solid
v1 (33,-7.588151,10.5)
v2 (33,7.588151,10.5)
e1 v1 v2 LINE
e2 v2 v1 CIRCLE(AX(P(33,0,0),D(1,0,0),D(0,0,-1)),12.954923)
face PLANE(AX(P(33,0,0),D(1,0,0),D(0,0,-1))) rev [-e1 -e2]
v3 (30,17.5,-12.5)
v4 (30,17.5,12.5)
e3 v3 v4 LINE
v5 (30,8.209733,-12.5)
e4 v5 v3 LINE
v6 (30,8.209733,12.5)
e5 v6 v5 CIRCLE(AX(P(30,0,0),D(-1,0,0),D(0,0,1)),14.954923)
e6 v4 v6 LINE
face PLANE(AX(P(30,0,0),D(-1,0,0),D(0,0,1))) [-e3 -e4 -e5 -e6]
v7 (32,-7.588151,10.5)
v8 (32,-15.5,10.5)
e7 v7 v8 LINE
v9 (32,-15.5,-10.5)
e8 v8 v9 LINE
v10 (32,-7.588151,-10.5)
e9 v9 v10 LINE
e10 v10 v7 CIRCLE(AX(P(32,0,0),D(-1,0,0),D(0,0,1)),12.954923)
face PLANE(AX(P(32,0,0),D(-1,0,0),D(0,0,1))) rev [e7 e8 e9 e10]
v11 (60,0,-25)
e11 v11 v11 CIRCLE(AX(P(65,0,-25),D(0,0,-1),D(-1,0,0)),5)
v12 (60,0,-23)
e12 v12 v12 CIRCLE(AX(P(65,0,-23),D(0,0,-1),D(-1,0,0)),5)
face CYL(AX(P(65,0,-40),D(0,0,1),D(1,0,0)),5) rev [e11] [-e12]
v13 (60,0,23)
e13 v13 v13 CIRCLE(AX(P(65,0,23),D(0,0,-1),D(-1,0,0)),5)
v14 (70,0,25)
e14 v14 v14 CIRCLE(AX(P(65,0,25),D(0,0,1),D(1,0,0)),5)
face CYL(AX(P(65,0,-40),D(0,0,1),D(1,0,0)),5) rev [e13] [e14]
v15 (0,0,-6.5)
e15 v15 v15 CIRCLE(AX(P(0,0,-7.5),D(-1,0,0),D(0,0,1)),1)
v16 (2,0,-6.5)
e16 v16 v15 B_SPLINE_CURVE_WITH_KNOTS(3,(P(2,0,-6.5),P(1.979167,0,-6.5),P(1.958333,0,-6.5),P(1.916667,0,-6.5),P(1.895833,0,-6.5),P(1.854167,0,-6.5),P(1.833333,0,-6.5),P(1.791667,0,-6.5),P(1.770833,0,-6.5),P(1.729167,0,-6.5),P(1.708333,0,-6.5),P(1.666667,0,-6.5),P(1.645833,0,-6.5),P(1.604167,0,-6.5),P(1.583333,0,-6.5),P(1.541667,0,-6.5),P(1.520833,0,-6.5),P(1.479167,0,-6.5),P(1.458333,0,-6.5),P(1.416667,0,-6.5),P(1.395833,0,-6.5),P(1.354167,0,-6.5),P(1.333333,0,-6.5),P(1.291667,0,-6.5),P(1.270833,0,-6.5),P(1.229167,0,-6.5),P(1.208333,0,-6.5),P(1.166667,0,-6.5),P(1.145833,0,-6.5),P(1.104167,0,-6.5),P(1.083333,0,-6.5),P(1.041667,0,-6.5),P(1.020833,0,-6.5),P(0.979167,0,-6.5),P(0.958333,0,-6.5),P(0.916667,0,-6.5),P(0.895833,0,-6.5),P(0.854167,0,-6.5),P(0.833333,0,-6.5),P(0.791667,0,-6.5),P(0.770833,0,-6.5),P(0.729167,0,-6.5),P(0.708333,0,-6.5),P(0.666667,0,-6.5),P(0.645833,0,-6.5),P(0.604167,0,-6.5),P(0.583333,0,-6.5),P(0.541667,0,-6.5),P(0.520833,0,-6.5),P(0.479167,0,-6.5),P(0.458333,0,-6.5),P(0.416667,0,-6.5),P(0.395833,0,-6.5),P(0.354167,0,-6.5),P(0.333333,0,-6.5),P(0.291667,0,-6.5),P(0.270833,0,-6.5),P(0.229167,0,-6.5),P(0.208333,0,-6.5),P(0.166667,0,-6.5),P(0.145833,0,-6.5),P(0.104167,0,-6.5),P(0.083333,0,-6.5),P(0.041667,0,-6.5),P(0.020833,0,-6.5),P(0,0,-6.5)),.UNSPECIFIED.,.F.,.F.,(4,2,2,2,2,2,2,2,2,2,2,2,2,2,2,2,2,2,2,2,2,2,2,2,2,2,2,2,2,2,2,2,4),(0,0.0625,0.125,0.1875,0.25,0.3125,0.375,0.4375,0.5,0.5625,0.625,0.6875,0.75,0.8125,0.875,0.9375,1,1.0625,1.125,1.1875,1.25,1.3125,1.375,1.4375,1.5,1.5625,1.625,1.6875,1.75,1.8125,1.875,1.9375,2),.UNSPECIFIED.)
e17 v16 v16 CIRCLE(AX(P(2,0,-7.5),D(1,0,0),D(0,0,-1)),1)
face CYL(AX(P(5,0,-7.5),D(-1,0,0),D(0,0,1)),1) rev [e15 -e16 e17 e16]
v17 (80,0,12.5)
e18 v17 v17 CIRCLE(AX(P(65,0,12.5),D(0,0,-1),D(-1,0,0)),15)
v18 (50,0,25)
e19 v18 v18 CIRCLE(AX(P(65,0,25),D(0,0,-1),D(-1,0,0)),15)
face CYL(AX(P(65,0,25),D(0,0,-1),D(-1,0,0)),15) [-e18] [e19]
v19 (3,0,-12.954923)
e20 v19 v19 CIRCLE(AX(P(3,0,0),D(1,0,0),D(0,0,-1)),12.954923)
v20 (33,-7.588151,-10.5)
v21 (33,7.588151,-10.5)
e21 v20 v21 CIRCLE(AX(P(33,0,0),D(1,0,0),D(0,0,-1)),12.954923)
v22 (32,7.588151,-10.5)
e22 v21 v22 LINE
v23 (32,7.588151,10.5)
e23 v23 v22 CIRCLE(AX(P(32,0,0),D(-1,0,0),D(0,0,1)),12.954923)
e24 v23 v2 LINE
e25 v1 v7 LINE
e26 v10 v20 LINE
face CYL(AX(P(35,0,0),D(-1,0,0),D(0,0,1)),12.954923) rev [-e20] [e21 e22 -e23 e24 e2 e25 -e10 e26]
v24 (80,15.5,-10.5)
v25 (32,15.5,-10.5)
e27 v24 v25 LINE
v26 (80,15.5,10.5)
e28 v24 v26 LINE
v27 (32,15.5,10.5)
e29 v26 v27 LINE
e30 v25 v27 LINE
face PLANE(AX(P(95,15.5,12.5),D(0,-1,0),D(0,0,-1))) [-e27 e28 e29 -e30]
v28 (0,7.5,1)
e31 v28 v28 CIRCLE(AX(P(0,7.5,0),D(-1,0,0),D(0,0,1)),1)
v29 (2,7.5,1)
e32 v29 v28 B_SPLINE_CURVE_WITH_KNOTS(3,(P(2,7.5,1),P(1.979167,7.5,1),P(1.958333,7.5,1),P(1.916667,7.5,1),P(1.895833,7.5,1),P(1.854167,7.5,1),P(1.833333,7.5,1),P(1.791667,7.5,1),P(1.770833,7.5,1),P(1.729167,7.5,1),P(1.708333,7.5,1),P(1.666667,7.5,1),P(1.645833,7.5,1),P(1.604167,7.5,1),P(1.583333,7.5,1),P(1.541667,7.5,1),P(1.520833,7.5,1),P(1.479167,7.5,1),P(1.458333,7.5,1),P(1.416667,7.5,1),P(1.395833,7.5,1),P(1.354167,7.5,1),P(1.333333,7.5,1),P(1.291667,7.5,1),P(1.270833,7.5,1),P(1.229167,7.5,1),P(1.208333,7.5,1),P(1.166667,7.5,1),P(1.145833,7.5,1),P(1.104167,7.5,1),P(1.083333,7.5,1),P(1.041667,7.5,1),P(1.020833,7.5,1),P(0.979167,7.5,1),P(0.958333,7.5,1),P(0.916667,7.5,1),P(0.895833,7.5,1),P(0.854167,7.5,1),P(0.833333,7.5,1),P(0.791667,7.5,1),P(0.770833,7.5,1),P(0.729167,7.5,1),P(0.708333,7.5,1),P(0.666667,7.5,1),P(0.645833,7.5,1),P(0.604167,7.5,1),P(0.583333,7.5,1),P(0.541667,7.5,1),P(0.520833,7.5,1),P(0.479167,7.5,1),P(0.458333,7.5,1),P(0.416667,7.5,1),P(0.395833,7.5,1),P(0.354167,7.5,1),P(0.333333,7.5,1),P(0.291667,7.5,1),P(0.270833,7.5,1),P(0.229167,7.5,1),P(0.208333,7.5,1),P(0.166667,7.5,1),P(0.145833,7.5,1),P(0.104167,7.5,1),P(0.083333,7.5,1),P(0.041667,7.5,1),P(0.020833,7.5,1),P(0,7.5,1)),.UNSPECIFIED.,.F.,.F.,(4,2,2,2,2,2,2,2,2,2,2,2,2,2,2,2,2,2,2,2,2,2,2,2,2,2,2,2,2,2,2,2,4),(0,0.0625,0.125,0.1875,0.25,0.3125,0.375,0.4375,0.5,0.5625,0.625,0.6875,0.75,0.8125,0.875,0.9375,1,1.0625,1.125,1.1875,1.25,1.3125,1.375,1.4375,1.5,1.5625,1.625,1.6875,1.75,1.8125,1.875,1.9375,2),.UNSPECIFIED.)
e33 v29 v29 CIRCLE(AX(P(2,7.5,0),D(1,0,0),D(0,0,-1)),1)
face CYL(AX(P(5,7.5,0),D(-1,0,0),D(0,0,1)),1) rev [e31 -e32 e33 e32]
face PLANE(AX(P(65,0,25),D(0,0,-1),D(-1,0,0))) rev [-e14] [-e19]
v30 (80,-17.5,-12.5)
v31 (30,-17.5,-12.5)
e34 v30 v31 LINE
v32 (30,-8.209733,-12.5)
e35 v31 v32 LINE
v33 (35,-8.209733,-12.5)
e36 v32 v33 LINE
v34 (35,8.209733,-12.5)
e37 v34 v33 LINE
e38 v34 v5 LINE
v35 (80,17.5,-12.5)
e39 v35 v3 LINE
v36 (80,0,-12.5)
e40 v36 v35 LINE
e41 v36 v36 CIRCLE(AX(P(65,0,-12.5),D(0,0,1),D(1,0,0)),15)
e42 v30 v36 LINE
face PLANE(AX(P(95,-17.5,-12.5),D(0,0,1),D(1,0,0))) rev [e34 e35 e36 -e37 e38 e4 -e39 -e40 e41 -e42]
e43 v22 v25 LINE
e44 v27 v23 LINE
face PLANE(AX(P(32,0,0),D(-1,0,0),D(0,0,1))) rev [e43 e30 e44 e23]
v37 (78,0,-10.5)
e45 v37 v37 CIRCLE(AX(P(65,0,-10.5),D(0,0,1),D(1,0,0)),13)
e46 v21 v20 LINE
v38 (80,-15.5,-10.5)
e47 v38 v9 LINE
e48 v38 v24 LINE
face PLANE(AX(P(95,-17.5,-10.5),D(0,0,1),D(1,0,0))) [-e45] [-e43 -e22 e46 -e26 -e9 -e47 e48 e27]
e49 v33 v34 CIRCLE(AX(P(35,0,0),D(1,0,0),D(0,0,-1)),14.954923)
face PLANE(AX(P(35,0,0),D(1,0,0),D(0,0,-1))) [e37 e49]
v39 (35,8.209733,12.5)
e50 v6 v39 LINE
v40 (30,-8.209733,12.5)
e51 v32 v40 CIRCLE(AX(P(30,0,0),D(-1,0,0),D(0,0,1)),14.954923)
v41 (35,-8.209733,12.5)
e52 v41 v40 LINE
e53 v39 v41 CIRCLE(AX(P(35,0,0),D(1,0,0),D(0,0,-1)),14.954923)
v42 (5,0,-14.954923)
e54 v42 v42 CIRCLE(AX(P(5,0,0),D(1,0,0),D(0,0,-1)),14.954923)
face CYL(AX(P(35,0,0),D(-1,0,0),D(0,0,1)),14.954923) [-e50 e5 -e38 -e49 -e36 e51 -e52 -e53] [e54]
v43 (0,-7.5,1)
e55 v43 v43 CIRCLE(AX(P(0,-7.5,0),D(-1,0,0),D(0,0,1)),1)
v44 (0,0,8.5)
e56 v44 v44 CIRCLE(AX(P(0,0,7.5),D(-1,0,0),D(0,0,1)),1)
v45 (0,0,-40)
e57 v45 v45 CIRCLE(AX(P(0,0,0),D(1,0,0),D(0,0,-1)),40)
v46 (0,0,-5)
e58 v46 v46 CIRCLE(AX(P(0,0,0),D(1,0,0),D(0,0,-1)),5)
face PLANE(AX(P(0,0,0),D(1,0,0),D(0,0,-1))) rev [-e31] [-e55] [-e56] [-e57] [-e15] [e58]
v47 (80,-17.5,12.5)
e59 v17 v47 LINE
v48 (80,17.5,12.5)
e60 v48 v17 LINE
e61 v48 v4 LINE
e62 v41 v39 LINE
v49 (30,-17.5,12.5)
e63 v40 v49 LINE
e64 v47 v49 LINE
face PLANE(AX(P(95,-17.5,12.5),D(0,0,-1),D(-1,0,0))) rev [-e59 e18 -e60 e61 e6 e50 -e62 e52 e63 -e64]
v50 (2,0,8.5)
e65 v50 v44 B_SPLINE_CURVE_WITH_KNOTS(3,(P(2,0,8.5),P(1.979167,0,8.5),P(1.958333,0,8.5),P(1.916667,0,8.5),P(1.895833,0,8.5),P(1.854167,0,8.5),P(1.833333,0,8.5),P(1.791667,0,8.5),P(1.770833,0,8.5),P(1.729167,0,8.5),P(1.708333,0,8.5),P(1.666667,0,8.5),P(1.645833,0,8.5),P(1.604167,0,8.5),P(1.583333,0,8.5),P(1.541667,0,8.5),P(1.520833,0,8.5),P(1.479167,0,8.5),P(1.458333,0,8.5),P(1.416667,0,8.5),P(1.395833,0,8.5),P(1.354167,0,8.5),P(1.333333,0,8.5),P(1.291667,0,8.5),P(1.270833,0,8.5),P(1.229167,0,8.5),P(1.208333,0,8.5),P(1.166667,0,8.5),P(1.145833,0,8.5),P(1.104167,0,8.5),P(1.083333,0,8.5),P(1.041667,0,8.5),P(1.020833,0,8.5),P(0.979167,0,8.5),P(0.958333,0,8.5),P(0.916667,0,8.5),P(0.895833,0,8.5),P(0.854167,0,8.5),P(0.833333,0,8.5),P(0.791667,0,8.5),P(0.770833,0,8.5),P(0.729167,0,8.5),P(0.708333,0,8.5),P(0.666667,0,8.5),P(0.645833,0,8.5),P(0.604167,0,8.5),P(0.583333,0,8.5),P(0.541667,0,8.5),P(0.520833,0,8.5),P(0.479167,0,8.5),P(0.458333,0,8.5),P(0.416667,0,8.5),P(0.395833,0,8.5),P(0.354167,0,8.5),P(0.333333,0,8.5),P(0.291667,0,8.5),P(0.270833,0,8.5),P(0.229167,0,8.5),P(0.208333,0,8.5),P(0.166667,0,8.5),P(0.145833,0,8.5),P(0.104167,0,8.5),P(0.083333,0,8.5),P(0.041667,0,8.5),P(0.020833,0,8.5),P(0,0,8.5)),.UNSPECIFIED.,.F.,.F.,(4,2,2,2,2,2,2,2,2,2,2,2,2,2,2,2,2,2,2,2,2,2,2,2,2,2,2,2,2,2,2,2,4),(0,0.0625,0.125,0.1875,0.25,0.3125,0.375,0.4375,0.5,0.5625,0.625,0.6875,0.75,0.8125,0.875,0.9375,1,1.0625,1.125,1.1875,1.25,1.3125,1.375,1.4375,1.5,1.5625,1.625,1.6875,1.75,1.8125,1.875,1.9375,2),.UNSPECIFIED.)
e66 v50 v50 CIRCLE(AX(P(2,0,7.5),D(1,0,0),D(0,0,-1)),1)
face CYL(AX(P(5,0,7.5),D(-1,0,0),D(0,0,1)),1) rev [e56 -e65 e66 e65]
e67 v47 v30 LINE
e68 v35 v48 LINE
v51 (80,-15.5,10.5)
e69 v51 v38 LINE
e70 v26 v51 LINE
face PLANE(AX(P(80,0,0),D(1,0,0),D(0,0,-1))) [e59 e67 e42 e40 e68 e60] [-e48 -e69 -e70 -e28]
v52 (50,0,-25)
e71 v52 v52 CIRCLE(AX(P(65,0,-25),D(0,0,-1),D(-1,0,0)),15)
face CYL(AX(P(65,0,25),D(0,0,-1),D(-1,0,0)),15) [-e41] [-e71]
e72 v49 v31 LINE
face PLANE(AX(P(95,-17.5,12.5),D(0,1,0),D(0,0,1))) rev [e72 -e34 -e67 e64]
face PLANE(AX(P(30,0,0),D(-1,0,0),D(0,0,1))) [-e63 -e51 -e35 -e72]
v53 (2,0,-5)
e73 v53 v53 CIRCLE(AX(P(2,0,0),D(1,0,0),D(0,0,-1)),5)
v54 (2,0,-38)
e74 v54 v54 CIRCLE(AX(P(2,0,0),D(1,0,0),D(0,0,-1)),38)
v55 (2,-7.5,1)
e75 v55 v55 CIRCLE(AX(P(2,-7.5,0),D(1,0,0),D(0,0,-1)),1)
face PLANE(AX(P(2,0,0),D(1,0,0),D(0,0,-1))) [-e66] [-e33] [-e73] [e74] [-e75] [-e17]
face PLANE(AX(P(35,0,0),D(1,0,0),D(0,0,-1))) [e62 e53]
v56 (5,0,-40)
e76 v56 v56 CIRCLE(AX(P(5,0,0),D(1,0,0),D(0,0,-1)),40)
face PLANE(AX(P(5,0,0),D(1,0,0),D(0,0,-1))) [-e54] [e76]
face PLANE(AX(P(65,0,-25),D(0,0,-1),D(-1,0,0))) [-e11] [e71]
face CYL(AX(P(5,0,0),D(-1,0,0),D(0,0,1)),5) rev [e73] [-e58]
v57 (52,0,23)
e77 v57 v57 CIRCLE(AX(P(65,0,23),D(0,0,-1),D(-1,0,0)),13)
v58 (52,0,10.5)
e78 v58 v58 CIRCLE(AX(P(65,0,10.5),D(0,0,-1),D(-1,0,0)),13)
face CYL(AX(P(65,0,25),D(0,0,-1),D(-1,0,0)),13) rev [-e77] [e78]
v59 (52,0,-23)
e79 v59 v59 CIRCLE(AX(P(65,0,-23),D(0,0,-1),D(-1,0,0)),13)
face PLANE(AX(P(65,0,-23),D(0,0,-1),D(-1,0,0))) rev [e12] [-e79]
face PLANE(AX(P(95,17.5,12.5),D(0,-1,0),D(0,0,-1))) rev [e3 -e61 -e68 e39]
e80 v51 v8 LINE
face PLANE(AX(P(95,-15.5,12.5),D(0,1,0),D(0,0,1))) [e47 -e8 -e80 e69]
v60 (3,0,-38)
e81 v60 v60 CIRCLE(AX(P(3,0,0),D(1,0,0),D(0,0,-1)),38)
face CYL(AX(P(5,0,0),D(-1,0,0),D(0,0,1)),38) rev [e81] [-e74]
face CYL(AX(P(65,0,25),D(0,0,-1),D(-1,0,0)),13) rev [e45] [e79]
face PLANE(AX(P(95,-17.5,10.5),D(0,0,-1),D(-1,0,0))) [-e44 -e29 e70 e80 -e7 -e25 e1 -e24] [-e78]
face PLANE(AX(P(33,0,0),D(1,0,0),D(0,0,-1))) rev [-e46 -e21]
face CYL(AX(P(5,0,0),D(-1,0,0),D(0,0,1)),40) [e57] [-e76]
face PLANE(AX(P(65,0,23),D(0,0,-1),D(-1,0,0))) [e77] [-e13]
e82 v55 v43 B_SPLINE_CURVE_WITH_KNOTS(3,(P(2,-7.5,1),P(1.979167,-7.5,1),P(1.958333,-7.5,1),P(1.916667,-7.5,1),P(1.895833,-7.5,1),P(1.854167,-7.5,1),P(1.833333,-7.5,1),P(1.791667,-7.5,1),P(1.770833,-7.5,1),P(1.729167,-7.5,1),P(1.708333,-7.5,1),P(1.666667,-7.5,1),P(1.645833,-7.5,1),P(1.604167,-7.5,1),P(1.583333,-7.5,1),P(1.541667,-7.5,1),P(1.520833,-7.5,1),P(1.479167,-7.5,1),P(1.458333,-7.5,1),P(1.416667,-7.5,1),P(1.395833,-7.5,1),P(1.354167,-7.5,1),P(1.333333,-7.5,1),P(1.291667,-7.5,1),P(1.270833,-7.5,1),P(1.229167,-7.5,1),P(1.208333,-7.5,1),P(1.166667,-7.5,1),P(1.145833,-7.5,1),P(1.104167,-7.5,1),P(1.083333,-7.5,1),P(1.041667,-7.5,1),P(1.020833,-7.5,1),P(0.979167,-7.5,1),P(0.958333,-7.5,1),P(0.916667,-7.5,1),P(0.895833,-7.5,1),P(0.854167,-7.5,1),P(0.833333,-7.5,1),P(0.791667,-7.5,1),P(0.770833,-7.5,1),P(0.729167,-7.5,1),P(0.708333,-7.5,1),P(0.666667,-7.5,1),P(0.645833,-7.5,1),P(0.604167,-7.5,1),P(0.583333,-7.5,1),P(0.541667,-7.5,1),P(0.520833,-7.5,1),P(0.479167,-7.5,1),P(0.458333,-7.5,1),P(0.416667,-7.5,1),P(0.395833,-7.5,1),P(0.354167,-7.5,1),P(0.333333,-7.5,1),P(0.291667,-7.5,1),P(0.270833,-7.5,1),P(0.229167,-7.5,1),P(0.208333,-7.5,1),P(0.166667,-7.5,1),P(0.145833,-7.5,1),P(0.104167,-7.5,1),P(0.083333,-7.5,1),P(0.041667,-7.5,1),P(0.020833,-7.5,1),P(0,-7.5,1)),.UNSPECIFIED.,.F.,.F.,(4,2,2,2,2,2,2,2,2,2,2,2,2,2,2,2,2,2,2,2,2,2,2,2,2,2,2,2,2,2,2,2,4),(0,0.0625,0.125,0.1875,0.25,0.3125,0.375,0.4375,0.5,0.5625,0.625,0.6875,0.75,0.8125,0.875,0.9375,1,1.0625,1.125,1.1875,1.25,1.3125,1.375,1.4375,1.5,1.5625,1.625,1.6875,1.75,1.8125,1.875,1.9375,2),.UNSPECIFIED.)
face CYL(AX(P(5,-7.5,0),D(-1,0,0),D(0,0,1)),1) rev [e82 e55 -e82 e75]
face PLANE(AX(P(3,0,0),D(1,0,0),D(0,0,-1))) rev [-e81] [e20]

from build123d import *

# Parameters (mm, degrees)
SKETCH1_R                = 40
SKETCH1_R_2              = 5
BOSS_EXTRUDE1_DEPTH      = 5
SKETCH2_R                = 14.954923049
SKETCH2_R_2              = 5
BOSS_EXTRUDE2_DEPTH      = 30
SKETCH3_W                = 25
SKETCH3_H                = 35
BOSS_EXTRUDE3_DEPTH      = 65
BOSS_EXTRUDE4_DEPTH      = 12.5
BOSS_EXTRUDE4_DEPTH_BACK = 37.5
SKETCH4_R                = 15
SKETCH9_R                = 5
CUT_EXTRUDE5_DEPTH       = 111.566721937
SHELL14_START            = 2
SHELL14_OUTLINE_R        = 5
SHELL14_DEPTH            = 91
SHELL14_START_2          = 32
SHELL14_2_DEPTH          = 61
SHELL14_3_OUTLINE_R      = 38
SHELL14_3_DEPTH          = 1
SHELL14_START_3          = 3
SHELL14_4_DEPTH          = 30
SHELL14_START_4          = -23
SHELL14_5_OUTLINE_R      = 13
SHELL14_5_DEPTH          = 46
SKETCH11_R               = 1
CUT_EXTRUDE6_DEPTH       = 5
SKETCH10_R               = 5
CUT_EXTRUDE7_DEPTH       = 122.86057607
SKETCH12_W               = 25
SKETCH12_H               = 35
CUT_EXTRUDE8_DEPTH       = 2
SKETCH16_W               = 32.02314812
SKETCH16_H               = 50.956542264
CUT_EXTRUDE9_DEPTH       = 13


with BuildPart() as part:
    # Sketch1 → Boss-Extrude1 (new body)
    with BuildSketch(Plane(origin=(0, 0, 0), x_dir=(0, 0, -1), z_dir=(1, 0, 0))):
        Circle(SKETCH1_R)
        Circle(SKETCH1_R_2, mode=Mode.SUBTRACT)
    extrude(amount=BOSS_EXTRUDE1_DEPTH)

    # Sketch2 → Boss-Extrude2 (add)
    with BuildSketch(Plane(origin=(5, 0, 0), x_dir=(0, 0, -1), z_dir=(1, 0, 0))):
        Circle(SKETCH2_R)
        Circle(SKETCH2_R_2, mode=Mode.SUBTRACT)
    extrude(amount=BOSS_EXTRUDE2_DEPTH)

    # Sketch3 → Boss-Extrude3 (add)
    with BuildSketch(Plane(origin=(30, 0, 0), x_dir=(0, 0, -1), z_dir=(1, 0, 0))):
        Rectangle(SKETCH3_W, SKETCH3_H)
    extrude(amount=BOSS_EXTRUDE3_DEPTH)

    # Sketch4 → Boss-Extrude4 (add, two sides: drawn at the far end of the back side and taken through both)
    with BuildSketch(Plane(origin=(0, 0, -12.5), x_dir=(-1, 0, 0), z_dir=(0, 0, -1)).offset(-BOSS_EXTRUDE4_DEPTH_BACK)):
        with Locations((-65, 0)):
            Circle(SKETCH4_R)
    extrude(amount=BOSS_EXTRUDE4_DEPTH + BOSS_EXTRUDE4_DEPTH_BACK)

    # Sketch9 → Cut-Extrude5 (cut, through all)
    with BuildSketch(Plane.ZY):
        Circle(SKETCH9_R)
    extrude(amount=-CUT_EXTRUDE5_DEPTH, mode=Mode.SUBTRACT)

    # Shell14: read off the stored shape, not the designer's step
    # Shell14 outline → Shell14 (cut)
    with BuildSketch(Plane.YZ.offset(SHELL14_START)):
        with BuildLine():
            ThreePointArc((7.588150711, -10.5), (12.954923049, 0), (7.588150711, 10.5))
            Line((7.588150711, 10.5), (-7.588150711, 10.5))
            ThreePointArc((-7.588150711, 10.5), (-12.954923049, 0), (-7.588150711, -10.5))
            Line((-7.588150711, -10.5), (7.588150711, -10.5))
        make_face()
        Circle(SHELL14_OUTLINE_R, mode=Mode.SUBTRACT)
    extrude(amount=SHELL14_DEPTH, mode=Mode.SUBTRACT)

    # Shell14 2 outline → Shell14 2 (cut)
    with BuildSketch(Plane.YZ.offset(SHELL14_START_2)):
        with BuildLine():
            ThreePointArc((7.588150711, 10.5), (12.954923049, 0), (7.588150711, -10.5))
            Line((7.588150711, -10.5), (15.5, -10.5))
            Line((15.5, -10.5), (15.5, 10.5))
            Line((15.5, 10.5), (7.588150711, 10.5))
        make_face()
        with BuildLine():
            ThreePointArc((-7.588150711, -10.5), (-12.954923049, 0), (-7.588150711, 10.5))
            Line((-7.588150711, 10.5), (-15.5, 10.5))
            Line((-15.5, 10.5), (-15.5, -10.5))
            Line((-15.5, -10.5), (-7.588150711, -10.5))
        make_face()
    extrude(amount=SHELL14_2_DEPTH, mode=Mode.SUBTRACT)

    # Shell14 3 outline → Shell14 3 (cut)
    with BuildSketch(Plane.YZ.offset(SHELL14_START)):
        Circle(SHELL14_3_OUTLINE_R)
        with BuildLine():
            ThreePointArc((7.588150711, 10.5), (12.954923049, 0), (7.588150711, -10.5))
            Line((7.588150711, -10.5), (-7.588150711, -10.5))
            ThreePointArc((-7.588150711, -10.5), (-12.954923049, 0), (-7.588150711, 10.5))
            Line((-7.588150711, 10.5), (7.588150711, 10.5))
        make_face(mode=Mode.SUBTRACT)
    extrude(amount=SHELL14_3_DEPTH, mode=Mode.SUBTRACT)

    # Shell14 4 outline → Shell14 4 (cut)
    with BuildSketch(Plane.YZ.offset(SHELL14_START_3)):
        with BuildLine():
            Line((-7.588150711, 10.5), (7.588150711, 10.5))
            ThreePointArc((7.588150711, 10.5), (0, 12.954923049), (-7.588150711, 10.5))
        make_face()
        with BuildLine():
            ThreePointArc((-7.588150711, -10.5), (0, -12.954923049), (7.588150711, -10.5))
            Line((7.588150711, -10.5), (-7.588150711, -10.5))
        make_face()
    extrude(amount=SHELL14_4_DEPTH, mode=Mode.SUBTRACT)

    # Shell14 5 outline → Shell14 5 (cut)
    with BuildSketch(Plane.XY.offset(SHELL14_START_4)):
        with Locations((65, 0)):
            Circle(SHELL14_5_OUTLINE_R)
    extrude(amount=SHELL14_5_DEPTH, mode=Mode.SUBTRACT)

    # Sketch11 → Cut-Extrude6 (cut)
    with BuildSketch(Plane.ZY):
        with Locations((0, 7.5)):
            Circle(SKETCH11_R)
        with Locations((7.5, 0)):
            Circle(SKETCH11_R)
        with Locations((0, -7.5)):
            Circle(SKETCH11_R)
        with Locations((-7.5, 0)):
            Circle(SKETCH11_R)
    extrude(amount=-CUT_EXTRUDE6_DEPTH, mode=Mode.SUBTRACT)

    # Sketch10 → Cut-Extrude7 (cut, through all)
    with BuildSketch(Plane.XY.offset(25)):
        with Locations((65, 0)):
            Circle(SKETCH10_R)
    extrude(amount=-CUT_EXTRUDE7_DEPTH, mode=Mode.SUBTRACT)

    # Sketch12 → Cut-Extrude8 (cut)
    with BuildSketch(Plane(origin=(95, 0, 0), x_dir=(0, 0, -1), z_dir=(1, 0, 0))):
        Rectangle(SKETCH12_W, SKETCH12_H)
    extrude(amount=-CUT_EXTRUDE8_DEPTH, mode=Mode.SUBTRACT)

    # Sketch16 → Cut-Extrude9 (cut)
    with BuildSketch(Plane(origin=(93, 0, 0), x_dir=(0, 0, -1), z_dir=(1, 0, 0))):
        with Locations((0.70123682, -2.512765272)):
            Rectangle(SKETCH16_W, SKETCH16_H)
    extrude(amount=-CUT_EXTRUDE9_DEPTH, mode=Mode.SUBTRACT)


solid = part.part
